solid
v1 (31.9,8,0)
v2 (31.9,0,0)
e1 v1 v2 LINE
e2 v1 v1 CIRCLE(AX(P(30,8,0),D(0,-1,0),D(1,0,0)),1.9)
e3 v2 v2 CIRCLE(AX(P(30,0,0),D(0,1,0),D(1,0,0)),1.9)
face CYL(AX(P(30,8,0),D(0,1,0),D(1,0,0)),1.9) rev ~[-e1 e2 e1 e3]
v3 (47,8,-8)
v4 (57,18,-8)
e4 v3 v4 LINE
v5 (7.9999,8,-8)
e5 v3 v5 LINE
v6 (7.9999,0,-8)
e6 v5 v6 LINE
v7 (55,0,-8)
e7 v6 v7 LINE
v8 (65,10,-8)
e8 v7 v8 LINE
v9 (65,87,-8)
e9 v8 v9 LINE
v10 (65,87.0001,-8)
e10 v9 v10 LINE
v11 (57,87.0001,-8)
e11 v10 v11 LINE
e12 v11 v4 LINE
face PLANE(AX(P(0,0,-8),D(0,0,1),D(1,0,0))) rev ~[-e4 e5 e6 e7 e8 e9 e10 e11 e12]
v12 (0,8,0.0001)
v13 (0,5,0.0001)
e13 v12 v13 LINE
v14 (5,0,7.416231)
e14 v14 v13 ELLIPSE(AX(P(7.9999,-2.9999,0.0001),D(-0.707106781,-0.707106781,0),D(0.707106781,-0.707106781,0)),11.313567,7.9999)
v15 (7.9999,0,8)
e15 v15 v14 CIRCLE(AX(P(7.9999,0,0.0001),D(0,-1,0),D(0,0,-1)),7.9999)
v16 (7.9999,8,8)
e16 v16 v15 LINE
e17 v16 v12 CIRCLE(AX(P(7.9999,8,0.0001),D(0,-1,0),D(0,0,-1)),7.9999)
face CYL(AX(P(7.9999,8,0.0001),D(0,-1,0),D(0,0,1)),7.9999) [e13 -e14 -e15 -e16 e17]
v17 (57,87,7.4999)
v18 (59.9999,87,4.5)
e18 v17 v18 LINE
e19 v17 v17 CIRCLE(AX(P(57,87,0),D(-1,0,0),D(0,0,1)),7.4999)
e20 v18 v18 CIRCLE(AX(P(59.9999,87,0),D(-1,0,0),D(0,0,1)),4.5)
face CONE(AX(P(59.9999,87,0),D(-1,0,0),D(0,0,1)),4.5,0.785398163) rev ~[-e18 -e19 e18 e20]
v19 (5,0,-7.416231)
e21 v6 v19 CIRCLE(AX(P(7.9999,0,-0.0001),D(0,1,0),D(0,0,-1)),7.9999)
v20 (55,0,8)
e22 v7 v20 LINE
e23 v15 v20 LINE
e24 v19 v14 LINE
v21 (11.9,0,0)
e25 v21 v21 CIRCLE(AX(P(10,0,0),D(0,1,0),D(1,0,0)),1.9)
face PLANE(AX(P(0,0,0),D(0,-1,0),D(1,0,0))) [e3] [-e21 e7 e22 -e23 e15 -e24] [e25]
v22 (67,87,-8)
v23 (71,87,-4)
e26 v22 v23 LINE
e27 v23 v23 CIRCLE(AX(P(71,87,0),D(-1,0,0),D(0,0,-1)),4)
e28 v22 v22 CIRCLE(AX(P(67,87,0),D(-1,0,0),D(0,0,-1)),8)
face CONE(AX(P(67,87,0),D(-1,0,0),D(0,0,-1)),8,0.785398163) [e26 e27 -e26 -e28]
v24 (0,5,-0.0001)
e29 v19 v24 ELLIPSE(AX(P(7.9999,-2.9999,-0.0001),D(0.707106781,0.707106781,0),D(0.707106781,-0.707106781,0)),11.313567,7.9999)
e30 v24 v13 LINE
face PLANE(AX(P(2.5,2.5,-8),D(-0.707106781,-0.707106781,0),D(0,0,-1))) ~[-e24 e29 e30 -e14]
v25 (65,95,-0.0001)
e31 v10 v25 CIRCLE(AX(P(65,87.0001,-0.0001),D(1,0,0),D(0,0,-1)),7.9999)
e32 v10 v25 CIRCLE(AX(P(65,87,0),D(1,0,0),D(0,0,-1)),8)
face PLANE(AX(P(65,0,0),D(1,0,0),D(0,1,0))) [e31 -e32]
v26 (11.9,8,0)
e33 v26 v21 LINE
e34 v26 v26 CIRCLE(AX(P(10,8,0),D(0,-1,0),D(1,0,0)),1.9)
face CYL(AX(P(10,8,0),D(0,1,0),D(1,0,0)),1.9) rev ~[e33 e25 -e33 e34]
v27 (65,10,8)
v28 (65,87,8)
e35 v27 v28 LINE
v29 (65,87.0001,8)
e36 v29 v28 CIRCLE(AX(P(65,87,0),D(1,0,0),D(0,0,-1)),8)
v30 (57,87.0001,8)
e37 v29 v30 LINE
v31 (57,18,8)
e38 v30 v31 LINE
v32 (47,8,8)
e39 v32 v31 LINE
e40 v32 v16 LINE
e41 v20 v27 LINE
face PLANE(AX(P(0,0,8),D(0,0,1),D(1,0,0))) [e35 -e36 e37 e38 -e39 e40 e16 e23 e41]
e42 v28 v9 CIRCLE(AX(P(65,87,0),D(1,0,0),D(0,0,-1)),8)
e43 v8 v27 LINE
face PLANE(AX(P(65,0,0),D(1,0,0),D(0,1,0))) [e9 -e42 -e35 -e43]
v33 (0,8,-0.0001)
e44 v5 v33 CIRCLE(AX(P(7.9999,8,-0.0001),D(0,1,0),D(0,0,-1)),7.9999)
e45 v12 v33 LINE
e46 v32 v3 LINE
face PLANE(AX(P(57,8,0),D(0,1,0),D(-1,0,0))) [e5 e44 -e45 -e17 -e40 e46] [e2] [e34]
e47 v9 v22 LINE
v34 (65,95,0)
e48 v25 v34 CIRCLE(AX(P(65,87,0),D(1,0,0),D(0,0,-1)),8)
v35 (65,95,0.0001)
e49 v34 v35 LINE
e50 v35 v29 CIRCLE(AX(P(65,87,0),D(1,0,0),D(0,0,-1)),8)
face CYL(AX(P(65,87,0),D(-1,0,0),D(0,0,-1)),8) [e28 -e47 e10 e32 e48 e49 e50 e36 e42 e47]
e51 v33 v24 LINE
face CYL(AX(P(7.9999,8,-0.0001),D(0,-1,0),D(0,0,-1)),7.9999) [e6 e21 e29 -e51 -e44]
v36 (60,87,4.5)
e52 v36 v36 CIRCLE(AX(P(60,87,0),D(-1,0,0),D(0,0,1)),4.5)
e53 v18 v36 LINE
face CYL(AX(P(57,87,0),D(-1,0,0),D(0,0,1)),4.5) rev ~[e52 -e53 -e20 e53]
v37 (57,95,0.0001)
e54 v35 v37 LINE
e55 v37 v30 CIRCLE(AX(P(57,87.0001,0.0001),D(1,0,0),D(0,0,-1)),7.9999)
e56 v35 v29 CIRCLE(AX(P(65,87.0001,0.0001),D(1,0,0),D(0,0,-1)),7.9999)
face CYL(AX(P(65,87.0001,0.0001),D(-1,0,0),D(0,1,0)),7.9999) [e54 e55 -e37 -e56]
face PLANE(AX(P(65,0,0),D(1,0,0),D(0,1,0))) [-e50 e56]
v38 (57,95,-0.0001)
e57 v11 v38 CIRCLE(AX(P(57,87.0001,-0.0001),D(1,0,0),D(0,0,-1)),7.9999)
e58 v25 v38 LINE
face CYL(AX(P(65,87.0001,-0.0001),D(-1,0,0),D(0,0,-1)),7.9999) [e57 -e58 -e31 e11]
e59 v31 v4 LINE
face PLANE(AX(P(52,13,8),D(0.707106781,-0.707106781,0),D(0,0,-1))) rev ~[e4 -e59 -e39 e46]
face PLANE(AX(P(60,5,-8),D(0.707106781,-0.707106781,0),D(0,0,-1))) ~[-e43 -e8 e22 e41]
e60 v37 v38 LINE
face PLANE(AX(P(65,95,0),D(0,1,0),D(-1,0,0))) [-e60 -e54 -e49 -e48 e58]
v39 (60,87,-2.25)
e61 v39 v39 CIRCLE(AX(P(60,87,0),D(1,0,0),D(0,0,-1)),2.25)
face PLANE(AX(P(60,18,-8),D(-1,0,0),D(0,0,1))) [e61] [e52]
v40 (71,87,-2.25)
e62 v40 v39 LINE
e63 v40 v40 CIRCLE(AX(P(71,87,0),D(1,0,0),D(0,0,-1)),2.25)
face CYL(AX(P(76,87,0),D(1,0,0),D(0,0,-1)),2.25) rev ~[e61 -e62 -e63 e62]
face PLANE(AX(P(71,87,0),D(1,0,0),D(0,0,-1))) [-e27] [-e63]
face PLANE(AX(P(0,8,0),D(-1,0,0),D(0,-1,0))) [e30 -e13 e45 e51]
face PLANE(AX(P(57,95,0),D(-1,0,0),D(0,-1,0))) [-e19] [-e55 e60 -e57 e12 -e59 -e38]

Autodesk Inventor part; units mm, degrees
ref_plane "YZ Plane" through (0, 0, 0) normal (1, 0, 0) x (0, 1, 0)
ref_plane "XZ Plane" through (0, 0, 0) normal (0, 1, 0) x (-1, 0, 0)
ref_plane "XY Plane" through (0, 0, 0) normal (0, 0, 1) x (1, 0, 0)
sketch "Sketch3" plane through (0, 0, 0) normal (0, 0, 1) x (1, 0, 0)
  line L0 (0, 0) -> (65, 0)
  line L1 (65, 0) -> (65, 95)
  line L2 (65, 95) -> (57, 95)
  line L3 (57, 95) -> (57, 8)
  line L4 (57, 8) -> (0, 8)
  line L5 (0, 8) -> (0, 0)
  dimension "d17" = 8
  dimension "d18" = 57
  dimension "d19" = 87
  dimension "d20" = 8
extrude "Extrusion3" add sketch "Sketch3" against normal mid plane 16
sketch "Sketch5" plane through (0, 8, -8) normal (0, 1, 0) x (1, 0, 0)
  line L0 (-13, -8) -> (78, -8) projected
  circle A0 centre (10, -8) radius 1.9
  circle A1 centre (30, -8) radius 1.9
  line L1 (0, 0) -> (0, -16) projected
  point P0 (0, -8)
  dimension "d23" = 3.8
  dimension "d24" = 3.8
  dimension "d25" = 10
  dimension "d26" = 20
extrude "Extrusion4" cut sketch "Sketch5" against normal through all
chamfer "Chamfer2" distance 5 angle 45 1 edges at (0, 0, 0)
chamfer "Chamfer3" distance 10 angle 45 1 edges at (57, 8, 0)
chamfer "Chamfer4" distance 10 angle 45 1 edges at (65, 0, 0)
sketch "Sketch6" plane through (65, 95, 8) normal (1, 0, 0) x (0, 0, -1)
  line L0 (16, -77) -> (16, 0) projected
  line L1 (0, -85) -> (0, 0) projected
  circle A0 centre (8, -8) radius 8
  line L2 (16, 0) -> (0, 0) projected
  point P0 (8, -95)
  dimension "d39" = 16
extrude "Extrusion5" add sketch "Sketch6" along normal blind 7 contours A0
fillet "Fillet1" radius 8 2 edges at (61, 95, -8) (61, 95, 8)
sketch "Sketch7" plane through (57, 18, -8) normal (-1, 0, 0) x (0, 0, 1)
  point P0 (8, -18)
sketch "Sketch8" plane through (72, 87, 0) normal (1, 0, 0) x (0, 0, -1)
  circle A0 centre (0, 0) radius 8 projected
  circle A1 centre (0, 0) radius 2.75
  point P0 (0, -87)
  dimension "d43" = 5.5
extrude "Extrusion6" add sketch "Sketch8" along normal blind 4 contours A1
sketch "Sketch9" plane through (76, 87, 0) normal (1, 0, 0) x (0, 0, -1)
  circle A0 centre (0, 0) radius 2.75 construction
  circle A1 centre (0, 0) radius 2.25
  point P0 (0, -87)
  dimension "d46" = 4.5
extrude "Extrusion7" cut sketch "Sketch9" against normal through all
sketch "Sketch10" plane through (57, 18, -8) normal (-1, 0, 0) x (0, 0, 1)
  circle A0 centre (8, 69) radius 2.25 projected
  circle A1 centre (8, 69) radius 4.5
  point P0 (8, -18)
  dimension "d49" = 9
extrude "Extrusion8" cut sketch "Sketch10" against normal blind 3
chamfer "Chamfer5" distance 3 angle 45 1 edges at (57, 87, -4.5)
chamfer "Chamfer6" distance 3 angle 45 1 edges at (72, 87, 2.75)
fillet "Fillet2" radius 8 2 edges at (0, 6.5, -8) (0, 6.5, 8)
sketch "Sketch11" plane through (76, 87, 0) normal (1, 0, 0) x (0, 0, -1)
  circle A0 centre (0, 0) radius 2.25 projected
  circle A1 centre (0, 0) radius 2.75 projected
  circle A2 centre (0, 0) radius 10.0452
  point P0 (0, -87)
extrude "Extrusion9" cut sketch "Sketch11" against normal blind 5 contours A0 | A1 | A2
chamfer "Chamfer7" distance 4 angle 45 1 edges at (71, 87, 8)
equation "\"d20\" = d17"
properties part number "_3DPrint"
